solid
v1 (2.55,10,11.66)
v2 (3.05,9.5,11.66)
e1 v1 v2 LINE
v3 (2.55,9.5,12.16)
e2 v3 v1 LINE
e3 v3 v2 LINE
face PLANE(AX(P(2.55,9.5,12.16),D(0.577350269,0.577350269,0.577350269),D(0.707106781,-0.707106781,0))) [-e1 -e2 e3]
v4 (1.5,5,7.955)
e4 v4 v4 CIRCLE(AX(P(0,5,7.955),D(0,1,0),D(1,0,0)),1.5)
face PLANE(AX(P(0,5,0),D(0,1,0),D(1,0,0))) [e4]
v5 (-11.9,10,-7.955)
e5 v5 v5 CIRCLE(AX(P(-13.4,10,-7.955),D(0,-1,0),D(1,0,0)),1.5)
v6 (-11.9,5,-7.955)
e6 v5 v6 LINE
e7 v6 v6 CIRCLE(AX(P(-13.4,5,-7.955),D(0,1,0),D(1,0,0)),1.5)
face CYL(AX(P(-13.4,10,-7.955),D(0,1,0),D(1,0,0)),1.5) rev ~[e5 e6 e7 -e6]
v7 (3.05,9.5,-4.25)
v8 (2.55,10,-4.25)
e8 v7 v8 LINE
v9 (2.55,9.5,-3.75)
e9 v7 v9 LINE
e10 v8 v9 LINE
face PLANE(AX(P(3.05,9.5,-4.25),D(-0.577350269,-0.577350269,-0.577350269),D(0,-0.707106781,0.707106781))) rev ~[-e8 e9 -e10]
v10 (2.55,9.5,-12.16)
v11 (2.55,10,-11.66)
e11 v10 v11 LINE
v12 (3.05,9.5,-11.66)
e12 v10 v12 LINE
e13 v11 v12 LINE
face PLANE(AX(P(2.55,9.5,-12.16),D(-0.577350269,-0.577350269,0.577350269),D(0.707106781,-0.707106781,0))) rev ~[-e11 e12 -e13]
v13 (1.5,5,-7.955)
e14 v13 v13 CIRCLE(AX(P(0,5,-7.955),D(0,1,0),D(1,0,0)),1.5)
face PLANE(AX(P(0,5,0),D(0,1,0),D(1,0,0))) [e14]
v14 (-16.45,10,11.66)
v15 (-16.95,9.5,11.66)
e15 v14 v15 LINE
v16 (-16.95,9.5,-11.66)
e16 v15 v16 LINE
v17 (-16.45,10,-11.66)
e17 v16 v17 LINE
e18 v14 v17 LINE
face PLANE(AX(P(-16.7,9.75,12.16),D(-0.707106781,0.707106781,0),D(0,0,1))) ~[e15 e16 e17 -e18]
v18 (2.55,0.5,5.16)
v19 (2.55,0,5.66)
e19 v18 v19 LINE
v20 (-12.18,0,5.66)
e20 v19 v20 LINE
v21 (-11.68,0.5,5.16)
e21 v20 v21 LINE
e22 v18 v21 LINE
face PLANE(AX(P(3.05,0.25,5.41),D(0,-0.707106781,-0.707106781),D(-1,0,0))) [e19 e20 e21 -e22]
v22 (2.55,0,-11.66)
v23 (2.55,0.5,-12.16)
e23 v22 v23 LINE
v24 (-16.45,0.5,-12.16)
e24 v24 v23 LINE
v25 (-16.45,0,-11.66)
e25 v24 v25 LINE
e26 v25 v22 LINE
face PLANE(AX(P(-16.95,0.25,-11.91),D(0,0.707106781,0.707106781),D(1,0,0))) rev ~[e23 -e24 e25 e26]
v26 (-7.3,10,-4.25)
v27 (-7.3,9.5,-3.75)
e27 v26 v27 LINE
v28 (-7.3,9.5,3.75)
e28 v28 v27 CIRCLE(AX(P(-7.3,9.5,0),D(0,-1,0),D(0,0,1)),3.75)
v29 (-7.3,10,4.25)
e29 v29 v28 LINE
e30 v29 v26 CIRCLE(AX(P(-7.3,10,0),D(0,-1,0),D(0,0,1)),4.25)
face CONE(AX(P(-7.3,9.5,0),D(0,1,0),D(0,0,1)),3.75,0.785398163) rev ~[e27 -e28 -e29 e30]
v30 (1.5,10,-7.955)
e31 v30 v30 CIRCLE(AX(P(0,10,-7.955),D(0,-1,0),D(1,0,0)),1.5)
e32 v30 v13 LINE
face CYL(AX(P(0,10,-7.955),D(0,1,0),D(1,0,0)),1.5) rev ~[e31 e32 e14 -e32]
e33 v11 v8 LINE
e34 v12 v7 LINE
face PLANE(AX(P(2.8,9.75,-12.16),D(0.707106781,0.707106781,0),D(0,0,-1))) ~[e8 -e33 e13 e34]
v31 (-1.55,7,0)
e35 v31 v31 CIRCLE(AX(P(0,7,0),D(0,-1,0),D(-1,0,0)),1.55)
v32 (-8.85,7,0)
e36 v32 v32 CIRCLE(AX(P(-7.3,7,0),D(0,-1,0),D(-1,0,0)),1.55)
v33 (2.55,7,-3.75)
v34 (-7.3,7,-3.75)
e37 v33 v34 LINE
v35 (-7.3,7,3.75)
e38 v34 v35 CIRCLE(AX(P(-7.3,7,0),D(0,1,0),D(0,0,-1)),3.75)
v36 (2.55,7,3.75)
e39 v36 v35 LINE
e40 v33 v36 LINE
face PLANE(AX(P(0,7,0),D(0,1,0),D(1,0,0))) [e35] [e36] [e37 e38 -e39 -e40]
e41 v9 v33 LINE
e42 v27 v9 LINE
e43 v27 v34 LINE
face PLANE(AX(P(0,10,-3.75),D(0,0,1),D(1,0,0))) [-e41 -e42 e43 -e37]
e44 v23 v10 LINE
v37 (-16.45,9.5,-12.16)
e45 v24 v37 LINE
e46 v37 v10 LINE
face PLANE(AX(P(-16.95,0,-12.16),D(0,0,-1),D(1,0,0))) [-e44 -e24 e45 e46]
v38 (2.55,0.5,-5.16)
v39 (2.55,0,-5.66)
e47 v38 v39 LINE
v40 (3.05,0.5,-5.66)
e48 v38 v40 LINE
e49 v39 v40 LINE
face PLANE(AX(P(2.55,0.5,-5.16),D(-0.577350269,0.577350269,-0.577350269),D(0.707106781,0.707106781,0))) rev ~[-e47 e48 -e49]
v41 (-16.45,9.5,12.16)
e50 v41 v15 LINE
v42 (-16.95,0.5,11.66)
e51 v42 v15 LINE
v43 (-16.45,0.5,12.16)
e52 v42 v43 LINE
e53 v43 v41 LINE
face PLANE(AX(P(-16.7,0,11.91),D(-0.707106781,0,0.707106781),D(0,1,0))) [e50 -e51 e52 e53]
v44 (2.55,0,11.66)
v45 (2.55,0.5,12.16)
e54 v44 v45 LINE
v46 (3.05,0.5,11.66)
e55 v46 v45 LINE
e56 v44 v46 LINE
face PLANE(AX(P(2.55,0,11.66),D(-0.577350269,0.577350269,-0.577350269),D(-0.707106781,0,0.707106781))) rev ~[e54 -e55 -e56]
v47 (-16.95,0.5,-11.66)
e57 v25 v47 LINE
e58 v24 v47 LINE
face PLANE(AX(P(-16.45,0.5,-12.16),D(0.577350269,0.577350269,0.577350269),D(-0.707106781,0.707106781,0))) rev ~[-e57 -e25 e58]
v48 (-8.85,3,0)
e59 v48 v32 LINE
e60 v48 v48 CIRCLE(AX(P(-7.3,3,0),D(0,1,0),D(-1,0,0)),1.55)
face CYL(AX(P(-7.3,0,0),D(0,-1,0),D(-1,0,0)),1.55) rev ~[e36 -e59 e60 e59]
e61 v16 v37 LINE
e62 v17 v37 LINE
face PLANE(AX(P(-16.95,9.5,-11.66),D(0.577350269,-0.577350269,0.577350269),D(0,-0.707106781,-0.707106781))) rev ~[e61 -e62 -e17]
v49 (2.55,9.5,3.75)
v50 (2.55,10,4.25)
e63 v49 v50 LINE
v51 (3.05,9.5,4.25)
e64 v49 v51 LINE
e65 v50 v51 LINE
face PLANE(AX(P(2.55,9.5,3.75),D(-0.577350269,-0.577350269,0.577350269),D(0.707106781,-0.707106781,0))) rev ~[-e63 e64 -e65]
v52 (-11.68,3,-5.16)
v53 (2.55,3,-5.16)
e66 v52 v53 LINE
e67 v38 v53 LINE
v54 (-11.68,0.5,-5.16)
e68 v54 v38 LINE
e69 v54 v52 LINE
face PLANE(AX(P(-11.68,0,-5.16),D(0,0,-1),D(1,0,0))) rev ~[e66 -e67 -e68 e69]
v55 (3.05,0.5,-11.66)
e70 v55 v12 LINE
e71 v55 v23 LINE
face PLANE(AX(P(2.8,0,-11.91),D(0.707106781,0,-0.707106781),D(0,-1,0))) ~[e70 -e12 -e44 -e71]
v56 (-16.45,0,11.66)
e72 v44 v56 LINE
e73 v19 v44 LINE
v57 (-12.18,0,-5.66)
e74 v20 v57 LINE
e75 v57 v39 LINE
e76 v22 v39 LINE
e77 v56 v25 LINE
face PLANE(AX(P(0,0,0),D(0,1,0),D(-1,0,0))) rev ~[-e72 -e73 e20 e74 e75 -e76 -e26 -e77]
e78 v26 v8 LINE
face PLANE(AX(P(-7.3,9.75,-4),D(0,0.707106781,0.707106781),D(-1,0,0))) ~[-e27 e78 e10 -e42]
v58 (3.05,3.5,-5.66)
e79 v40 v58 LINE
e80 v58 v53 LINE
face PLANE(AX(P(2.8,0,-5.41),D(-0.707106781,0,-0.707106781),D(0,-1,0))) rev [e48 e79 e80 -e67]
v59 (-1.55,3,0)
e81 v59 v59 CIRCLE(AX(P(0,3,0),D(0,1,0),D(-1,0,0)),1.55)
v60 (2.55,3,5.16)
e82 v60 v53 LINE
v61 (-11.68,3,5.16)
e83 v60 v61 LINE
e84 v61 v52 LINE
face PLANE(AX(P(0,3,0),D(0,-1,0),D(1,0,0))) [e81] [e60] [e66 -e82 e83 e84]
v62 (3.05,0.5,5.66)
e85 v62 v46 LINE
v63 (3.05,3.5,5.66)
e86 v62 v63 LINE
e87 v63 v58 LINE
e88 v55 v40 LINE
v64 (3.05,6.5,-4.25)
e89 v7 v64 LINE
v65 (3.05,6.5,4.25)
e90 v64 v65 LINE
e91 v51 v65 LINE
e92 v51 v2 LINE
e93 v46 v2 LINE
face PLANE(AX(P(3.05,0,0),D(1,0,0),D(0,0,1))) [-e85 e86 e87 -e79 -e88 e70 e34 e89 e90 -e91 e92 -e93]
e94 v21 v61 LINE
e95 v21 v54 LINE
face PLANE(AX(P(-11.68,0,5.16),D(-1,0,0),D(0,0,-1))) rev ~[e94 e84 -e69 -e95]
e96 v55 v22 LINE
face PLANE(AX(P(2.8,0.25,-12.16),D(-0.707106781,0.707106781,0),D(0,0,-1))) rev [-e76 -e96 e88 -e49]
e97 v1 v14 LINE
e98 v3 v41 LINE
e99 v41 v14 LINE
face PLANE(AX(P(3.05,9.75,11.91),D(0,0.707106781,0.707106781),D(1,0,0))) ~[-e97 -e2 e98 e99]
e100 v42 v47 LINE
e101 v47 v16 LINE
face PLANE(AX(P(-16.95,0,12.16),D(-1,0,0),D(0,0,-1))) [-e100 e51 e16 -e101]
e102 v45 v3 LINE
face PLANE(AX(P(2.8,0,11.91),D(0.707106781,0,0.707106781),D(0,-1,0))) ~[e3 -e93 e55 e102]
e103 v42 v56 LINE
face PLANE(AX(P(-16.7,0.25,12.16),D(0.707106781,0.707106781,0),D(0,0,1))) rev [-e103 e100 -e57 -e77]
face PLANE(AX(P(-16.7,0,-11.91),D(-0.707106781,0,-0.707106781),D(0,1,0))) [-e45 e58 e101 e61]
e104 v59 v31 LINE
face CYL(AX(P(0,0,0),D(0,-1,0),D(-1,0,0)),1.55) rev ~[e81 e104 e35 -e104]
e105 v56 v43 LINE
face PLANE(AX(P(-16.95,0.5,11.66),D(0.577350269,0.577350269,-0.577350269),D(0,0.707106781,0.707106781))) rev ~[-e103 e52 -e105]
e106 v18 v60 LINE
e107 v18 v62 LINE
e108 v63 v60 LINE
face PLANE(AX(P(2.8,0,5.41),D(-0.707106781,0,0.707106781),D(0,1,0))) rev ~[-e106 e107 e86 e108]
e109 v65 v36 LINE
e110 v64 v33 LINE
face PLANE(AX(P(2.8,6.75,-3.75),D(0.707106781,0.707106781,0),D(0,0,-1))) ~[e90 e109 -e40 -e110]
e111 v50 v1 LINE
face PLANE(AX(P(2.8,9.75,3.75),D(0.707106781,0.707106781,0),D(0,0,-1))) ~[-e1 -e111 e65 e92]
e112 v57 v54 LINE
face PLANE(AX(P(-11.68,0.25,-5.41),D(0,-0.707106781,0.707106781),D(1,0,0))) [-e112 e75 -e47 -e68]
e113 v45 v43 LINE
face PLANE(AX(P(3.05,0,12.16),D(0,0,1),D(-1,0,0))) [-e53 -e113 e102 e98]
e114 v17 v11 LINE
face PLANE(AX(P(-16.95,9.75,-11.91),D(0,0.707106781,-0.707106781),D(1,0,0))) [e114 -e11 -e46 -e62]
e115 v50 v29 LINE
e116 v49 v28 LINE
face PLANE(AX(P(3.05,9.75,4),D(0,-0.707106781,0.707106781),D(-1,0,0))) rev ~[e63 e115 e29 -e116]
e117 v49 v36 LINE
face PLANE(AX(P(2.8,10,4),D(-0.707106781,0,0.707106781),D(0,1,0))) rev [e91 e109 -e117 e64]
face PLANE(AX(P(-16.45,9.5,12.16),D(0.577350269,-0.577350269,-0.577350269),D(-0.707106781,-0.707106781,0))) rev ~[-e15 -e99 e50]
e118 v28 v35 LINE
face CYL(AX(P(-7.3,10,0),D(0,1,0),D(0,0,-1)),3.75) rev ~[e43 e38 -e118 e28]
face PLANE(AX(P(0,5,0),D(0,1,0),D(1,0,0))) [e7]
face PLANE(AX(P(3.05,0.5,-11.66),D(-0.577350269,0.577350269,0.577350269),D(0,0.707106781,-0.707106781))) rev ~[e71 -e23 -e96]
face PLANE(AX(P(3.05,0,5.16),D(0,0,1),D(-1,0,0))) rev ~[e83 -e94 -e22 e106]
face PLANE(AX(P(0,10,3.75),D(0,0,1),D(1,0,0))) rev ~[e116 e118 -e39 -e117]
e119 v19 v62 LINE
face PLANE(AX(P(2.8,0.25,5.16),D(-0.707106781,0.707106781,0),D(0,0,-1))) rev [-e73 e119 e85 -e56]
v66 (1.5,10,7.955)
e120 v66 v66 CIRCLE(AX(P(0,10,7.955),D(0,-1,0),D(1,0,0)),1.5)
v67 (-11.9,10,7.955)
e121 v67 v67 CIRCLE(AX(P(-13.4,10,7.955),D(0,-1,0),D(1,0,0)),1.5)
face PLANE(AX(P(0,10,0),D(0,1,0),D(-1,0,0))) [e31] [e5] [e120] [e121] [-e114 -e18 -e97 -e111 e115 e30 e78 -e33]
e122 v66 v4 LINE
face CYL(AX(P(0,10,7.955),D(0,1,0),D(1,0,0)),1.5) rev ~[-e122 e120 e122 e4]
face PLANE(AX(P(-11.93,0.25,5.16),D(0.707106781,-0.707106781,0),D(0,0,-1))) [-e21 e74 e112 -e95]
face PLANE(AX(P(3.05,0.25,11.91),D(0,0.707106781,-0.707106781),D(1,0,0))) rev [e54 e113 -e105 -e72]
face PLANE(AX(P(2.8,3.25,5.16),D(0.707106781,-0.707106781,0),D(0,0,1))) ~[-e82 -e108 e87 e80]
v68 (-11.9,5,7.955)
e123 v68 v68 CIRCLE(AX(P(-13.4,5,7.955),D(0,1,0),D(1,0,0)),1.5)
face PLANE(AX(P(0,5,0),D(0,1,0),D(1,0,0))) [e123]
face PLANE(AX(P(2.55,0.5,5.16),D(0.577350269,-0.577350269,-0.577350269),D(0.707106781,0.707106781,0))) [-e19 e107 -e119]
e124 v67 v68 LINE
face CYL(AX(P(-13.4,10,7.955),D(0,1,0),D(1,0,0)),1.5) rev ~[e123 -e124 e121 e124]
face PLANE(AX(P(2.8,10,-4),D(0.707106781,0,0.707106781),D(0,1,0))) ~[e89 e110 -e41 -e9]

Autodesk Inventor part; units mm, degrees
ref_plane "YZ Plane" through (0, 0, 0) normal (1, 0, 0) x (0, 1, 0)
ref_plane "XZ Plane" through (0, 0, 0) normal (0, 1, 0) x (-1, 0, 0)
ref_plane "XY Plane" through (0, 0, 0) normal (0, 0, 1) x (1, 0, 0)
sketch "Sketch1" plane through (0, 0, 0) normal (0, 1, 0) x (-1, 0, 0)
  circle A0 centre (7.3, 0) radius 1.55
  circle A1 centre (0, 0) radius 1.55
  line L0 (0, 10.8163) -> (0, -10.8163)
  line L1 (6.335, 0) -> (-6.335, 0)
  line L2 (-3.05, 12.16) -> (16.95, 12.16)
  line L3 (16.95, 12.16) -> (16.95, -12.16)
  line L4 (16.95, -12.16) -> (-3.05, -12.16)
  line L5 (-3.05, -12.16) -> (-3.05, 12.16)
  dimension "d0" = 3.1
  dimension "d1" = 7.3
  dimension "d2" = 1.5
  dimension "d3" = 24.32
  dimension "d4" = 20
extrude "Extrusion1" add sketch "Sketch1" along normal blind 10
sketch "Sketch2" plane through (0, 0, 0) normal (0, -1, 0) x (1, 0, 0)
  line L0 (3.05, 5.16) -> (-11.68, 5.16)
  line L1 (-11.68, 5.16) -> (-11.68, -5.16)
  line L2 (-11.68, -5.16) -> (3.05, -5.16)
  line L3 (3.05, -5.16) -> (3.05, 5.16)
  circle A0 centre (0, 0) radius 1.55 projected
  circle A1 centre (-7.3, 0) radius 1.55 projected
  line L4 (0, 0) -> (-7.3, 0)
  line L5 (3.05, 12.16) -> (3.05, -12.16) projected
  dimension "d7" = 10.32
  dimension "d8" = 4.38
extrude "Extrusion2" cut sketch "Sketch2" against normal blind 3
sketch "Sketch3" plane through (0, 10, 0) normal (0, 1, 0) x (1, 0, 0)
  circle A0 centre (-7.3, 0) radius 1.55 projected
  circle A1 centre (0, 0) radius 1.55 projected
  arc A2 (3.05, -2.1817) -> (3.05, 2.1817) centre (0, 0) ccw
  arc A3 (-7.3, 3.75) -> (-7.3, -3.75) centre (-7.3, 0) ccw
  line L0 (3.05, -12.16) -> (3.05, 12.16) projected
  line L1 (-7.3, 3.75) -> (0, 3.75)
  line L2 (-7.3, -3.75) -> (0, -3.75)
  line L3 (3.05, -2.1817) -> (3.05, 2.1817)
  line L4 (3.05, -2.1817) -> (3.05, 2.1817)
  line L5 (0, -3.75) -> (3.05, -3.75)
  line L6 (0, 3.75) -> (3.05, 3.75)
  dimension "d11" = 7.5
extrude "Extrusion3" cut sketch "Sketch3" against normal blind 3 contours L0 L5 L2 A3 L1 L6
sketch "Sketch4" plane through (0, 10, 0) normal (0, 1, 0) x (1, 0, 0)
  line L0 (3.05, -12.16) -> (3.05, -3.75) projected
  line L1 (3.05, -3.75) -> (-7.3, -3.75) projected
  arc A0 (-7.3, 3.75) -> (-7.3, -3.75) centre (-7.3, 0) ccw projected
  line L2 (-7.3, 3.75) -> (3.05, 3.75) projected
  line L3 (3.05, 3.75) -> (3.05, -3.75) projected
  circle A1 centre (0, -7.955) radius 1.5
  circle A2 centre (-13.4, -7.955) radius 1.5
  line L4 (-16.95, 12.16) -> (-16.95, -12.16) projected
  line L5 (-16.95, 0) -> (3.05, 0)
  circle A3 centre (0, 7.955) radius 1.5
  circle A4 centre (-13.4, 7.955) radius 1.5
  line L6 (3.05, -7.955) -> (-16.95, -7.955)
  line L7 (3.05, 5.16) -> (3.05, 12.16) projected
  line L8 (3.05, 7.955) -> (-16.95, 7.955)
  line L9 (-11.05, 0) -> (-16.95, 0) construction
  point P0 (0, 0)
  dimension "d15" = 3
  dimension "d16" = 3
  dimension "d18" = 3.05
  dimension "d19" = 3.55
extrude "Extrusion4" cut sketch "Sketch4" against normal blind 5 contours L6 A1 | A1 L6 | L6 A2 | A2 L6 | L8 A3 | A3 L8 | L8 A4 | A4 L8
chamfer "Chamfer1" distance 0.5 angle 45 26 edges at (3.05, 10, 7.955) (-2.125, 10, 3.75) (-11.05, 10, 0) (-2.125, 10, -3.75) (3.05, 10, -7.955) (-6.95, 10, -12.16) (-16.95, 10, 0) (-6.95, 10, 12.16) (3.05, 5, 12.16) (3.05, 0, 8.66) (-6.95, 0, 12.16) (-16.95, 0, 0) (-6.95, 0, -12.16) (3.05, 0, -8.66) (3.05, 5, -12.16) (-16.95, 5, -12.16) (-16.95, 5, 12.16) (-11.68, 0, 0) (-4.315, 0, 5.16) (-4.315, 0, -5.16) (3.05, 1.5, 5.16) (3.05, 1.5, -5.16) (3.05, 3, 0) (3.05, 7, 0) (3.05, 8.5, 3.75) (3.05, 8.5, -3.75)
equation "\"d0\" = spacer_hole_diameter"
equation "\"d1\" = load_cell_hole_discance"
equation "\"load_cell_hole_discance\" = 7.3"
equation "\"spacer_hole_diameter\" = 3.1"
equation "\"load_cell_width\" = 9.32"
equation "\"load_cell_hole_edge\" = 4.18"
properties part number "load_cell_connector_bottom"
